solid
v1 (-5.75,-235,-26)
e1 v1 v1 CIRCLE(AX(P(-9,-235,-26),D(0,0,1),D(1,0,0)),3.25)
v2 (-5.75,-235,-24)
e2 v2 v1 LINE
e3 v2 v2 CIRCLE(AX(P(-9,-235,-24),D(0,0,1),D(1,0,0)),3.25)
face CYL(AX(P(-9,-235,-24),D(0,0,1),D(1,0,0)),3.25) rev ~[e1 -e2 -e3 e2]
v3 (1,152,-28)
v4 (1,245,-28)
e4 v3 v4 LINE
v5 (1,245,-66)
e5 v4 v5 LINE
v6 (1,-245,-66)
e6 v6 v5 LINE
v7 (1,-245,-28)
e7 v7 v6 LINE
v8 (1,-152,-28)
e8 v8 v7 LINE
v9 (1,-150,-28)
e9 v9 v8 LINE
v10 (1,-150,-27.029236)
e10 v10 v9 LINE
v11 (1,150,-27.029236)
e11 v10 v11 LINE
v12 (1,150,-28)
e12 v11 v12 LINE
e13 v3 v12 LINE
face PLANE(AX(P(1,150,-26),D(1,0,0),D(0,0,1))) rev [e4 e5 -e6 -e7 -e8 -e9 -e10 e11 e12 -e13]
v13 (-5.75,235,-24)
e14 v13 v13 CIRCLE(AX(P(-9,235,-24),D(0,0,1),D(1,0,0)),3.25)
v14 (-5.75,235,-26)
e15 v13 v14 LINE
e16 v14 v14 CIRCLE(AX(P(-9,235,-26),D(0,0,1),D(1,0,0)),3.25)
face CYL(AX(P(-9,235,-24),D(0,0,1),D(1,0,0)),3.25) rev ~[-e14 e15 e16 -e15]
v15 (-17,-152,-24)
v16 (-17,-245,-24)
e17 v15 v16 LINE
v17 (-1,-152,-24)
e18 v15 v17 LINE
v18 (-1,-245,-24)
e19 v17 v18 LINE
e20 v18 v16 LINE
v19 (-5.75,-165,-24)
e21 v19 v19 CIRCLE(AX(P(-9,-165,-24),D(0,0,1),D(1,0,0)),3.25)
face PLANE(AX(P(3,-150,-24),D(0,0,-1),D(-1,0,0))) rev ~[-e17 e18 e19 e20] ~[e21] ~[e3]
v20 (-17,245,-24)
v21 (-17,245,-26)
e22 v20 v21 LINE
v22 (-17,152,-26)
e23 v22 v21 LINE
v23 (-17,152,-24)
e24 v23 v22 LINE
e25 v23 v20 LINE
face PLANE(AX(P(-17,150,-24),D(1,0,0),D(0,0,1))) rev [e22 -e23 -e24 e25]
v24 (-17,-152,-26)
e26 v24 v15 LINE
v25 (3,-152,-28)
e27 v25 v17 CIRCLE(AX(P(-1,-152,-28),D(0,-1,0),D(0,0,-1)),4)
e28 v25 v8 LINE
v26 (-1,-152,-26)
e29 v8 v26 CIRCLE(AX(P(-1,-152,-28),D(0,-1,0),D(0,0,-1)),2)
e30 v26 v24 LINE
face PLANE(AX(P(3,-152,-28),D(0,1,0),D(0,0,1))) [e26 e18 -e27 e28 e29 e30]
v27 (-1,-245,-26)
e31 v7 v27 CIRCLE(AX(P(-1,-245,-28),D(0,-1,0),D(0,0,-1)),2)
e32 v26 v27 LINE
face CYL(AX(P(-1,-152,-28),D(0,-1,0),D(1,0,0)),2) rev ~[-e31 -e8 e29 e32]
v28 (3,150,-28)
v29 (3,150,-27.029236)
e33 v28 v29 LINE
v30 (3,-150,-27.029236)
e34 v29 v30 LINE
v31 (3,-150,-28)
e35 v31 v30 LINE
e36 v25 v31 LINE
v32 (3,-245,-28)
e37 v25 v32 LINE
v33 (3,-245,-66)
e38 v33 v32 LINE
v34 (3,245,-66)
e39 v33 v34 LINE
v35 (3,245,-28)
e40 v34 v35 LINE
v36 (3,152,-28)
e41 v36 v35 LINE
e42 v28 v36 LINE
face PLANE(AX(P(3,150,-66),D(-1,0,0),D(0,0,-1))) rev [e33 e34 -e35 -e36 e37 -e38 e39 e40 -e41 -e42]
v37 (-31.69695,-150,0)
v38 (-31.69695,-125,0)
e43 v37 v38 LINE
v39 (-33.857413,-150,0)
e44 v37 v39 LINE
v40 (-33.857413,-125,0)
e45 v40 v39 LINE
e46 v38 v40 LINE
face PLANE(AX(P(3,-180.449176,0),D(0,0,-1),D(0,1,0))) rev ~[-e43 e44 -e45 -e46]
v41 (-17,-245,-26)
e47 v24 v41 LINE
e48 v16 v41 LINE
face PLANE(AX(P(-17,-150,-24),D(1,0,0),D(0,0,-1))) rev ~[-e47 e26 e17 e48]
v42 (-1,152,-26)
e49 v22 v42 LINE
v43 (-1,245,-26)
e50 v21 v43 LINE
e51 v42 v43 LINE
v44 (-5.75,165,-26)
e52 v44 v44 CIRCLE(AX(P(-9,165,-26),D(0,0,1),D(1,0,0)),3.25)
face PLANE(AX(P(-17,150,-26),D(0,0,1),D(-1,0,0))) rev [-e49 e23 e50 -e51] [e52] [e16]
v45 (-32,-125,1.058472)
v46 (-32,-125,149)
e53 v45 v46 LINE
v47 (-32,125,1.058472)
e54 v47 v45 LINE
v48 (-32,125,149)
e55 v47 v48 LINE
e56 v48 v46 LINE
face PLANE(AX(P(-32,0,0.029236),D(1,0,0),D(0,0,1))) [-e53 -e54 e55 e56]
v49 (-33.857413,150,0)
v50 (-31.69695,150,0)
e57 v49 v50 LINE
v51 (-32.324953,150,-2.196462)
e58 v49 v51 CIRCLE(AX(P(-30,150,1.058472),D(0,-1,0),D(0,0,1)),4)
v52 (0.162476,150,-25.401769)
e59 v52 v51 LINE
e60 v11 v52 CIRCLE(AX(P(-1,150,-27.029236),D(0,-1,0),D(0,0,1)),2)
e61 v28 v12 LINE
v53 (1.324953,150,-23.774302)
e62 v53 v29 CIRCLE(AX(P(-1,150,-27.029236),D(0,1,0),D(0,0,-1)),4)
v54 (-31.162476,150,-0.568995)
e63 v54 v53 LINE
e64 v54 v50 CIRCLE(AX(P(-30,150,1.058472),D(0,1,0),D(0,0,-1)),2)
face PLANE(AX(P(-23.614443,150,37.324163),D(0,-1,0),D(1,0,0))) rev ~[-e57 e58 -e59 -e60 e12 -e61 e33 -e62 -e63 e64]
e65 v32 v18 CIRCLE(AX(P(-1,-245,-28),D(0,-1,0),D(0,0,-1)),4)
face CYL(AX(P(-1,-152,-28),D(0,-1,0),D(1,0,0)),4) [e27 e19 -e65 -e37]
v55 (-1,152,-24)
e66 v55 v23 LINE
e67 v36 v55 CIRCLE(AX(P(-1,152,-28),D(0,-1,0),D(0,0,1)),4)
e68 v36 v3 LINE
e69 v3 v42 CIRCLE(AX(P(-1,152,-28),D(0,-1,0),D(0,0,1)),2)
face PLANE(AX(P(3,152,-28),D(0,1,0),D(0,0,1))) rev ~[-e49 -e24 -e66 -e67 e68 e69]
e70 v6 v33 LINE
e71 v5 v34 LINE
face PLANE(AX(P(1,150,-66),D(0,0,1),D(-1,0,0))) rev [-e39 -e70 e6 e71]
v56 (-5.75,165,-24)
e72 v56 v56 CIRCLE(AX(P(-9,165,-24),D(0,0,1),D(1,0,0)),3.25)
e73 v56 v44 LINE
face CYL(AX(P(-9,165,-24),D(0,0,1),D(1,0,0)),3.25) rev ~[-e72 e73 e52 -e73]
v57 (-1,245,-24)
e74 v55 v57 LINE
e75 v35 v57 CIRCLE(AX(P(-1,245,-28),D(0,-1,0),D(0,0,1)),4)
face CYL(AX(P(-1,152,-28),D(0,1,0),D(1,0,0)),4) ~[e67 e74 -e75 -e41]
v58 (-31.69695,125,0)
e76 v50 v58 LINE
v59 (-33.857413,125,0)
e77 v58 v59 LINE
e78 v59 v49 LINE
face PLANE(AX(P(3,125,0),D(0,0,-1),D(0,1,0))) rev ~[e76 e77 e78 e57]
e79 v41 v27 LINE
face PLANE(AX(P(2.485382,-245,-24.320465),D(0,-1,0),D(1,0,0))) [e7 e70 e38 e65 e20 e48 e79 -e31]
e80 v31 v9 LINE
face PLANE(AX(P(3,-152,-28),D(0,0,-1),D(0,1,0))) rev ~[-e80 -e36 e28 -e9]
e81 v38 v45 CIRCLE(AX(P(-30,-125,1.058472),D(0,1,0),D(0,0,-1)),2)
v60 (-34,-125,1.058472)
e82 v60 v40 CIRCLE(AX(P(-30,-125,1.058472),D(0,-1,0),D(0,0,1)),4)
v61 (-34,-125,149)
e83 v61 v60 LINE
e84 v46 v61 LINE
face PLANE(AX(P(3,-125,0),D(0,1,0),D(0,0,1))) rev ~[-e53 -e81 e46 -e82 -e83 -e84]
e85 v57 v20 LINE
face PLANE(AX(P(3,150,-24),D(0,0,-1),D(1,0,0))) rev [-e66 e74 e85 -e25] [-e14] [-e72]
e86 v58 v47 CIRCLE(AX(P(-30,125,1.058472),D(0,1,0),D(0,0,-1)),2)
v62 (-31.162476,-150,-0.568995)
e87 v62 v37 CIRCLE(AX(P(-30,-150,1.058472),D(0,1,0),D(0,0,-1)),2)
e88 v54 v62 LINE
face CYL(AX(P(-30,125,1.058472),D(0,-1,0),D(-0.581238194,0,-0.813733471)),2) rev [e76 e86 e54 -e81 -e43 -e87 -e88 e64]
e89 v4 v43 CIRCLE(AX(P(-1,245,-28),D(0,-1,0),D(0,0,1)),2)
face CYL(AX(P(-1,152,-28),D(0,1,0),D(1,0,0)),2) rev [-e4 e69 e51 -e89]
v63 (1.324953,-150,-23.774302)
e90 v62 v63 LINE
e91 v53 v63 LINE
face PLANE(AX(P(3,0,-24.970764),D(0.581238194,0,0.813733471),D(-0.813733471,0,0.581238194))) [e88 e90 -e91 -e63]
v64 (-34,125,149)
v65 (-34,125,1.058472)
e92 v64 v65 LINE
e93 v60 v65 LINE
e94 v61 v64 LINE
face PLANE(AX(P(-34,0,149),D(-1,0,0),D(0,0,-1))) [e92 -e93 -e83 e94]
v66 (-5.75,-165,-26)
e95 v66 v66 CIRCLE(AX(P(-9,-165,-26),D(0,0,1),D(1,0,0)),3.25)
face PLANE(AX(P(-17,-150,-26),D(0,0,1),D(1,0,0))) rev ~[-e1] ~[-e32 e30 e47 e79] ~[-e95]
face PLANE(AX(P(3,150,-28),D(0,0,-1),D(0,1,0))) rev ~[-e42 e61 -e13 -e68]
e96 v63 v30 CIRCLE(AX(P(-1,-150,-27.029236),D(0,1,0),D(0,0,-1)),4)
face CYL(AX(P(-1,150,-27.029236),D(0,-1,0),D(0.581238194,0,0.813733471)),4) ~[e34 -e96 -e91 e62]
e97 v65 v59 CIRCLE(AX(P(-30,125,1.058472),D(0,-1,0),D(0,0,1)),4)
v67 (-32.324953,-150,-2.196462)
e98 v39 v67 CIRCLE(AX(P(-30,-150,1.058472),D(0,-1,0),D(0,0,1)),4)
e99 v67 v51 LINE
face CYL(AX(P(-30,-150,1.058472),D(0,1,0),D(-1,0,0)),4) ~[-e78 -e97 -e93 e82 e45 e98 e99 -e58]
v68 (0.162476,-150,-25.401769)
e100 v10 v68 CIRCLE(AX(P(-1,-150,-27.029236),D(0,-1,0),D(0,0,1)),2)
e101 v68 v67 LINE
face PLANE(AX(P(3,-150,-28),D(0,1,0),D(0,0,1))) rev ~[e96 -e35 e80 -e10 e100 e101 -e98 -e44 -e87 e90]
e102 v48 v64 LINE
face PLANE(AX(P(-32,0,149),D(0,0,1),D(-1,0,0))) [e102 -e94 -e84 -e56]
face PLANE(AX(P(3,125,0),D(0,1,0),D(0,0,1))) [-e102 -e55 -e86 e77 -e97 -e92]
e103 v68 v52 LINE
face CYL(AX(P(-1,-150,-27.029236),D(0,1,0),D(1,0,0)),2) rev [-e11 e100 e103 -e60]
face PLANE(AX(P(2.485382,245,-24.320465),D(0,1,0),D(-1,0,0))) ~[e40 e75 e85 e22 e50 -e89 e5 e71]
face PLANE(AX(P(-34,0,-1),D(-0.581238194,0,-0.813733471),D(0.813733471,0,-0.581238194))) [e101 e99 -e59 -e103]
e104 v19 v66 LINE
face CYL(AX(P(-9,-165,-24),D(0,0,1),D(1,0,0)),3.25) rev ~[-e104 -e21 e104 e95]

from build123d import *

# Parameters (mm, degrees)
F1_DEPTH  = 150
F3_DEPTH  = 95
F4_W      = 2
F4_H      = 56
F6_DEPTH  = 25
F5_W      = 55.4491758279
F5_H      = 188.3780552482
F7_DEPTH  = 50
F8_R      = 2
F9_R      = 4
F10_R     = 3.25
F11_DEPTH = 25


# Not quite as in the source:
# - a pattern or mirror of a feature is missing from the dataset's text; its kind, count and spacing are read off the source's solid


with BuildPart() as f1:
    # F0 (on Front) → F1 (new body, symmetric)
    with BuildSketch(Plane.XZ):
        Polygon((1, -26), (1, -66), (3, -66), (3, -24.9707642094), (-32, 0.0292357906), (-32, 149), (-34, 149), (-34, -1), align=None)
    extrude(amount=F1_DEPTH, both=True)

    # F2 (on face) → F3 (join)
    with BuildSketch(Plane.XZ.offset(150)):
        Polygon((1.6409301068, -24), (3, -24.9707642094), (3, -24), align=None)
        Polygon((-17, -26), (1, -26), (-1.8, -24), (-17, -24), align=None)
        Polygon((1, -27.0292357906), (1, -66), (3, -66), (3, -24.9707642094), (1.6409301068, -24), (-1.8, -24), (1, -26), align=None)
    f3 = extrude(amount=F3_DEPTH)

    # F3_copies: F3 across plane
    add(f3.mirror(Plane.ZX))

    # F4 (on face) → F6 (cut)
    with BuildSketch(Plane.YZ.offset(3)):
        with Locations((-151, 0)):
            Rectangle(F4_W, F4_H)
        with Locations((151, 0)):
            Rectangle(F4_W, F4_H)
    extrude(amount=-F6_DEPTH, mode=Mode.SUBTRACT)

    # F5 (on face) → F7 (cut)
    with BuildSketch(Plane.YZ.offset(3)):
        with Locations((152.724587914, 94.1890276241)):
            Rectangle(F5_W, F5_H)
        with Locations((-152.724587914, 94.1890276241)):
            Rectangle(F5_W, F5_H)
    extrude(amount=-F7_DEPTH, mode=Mode.SUBTRACT)

    # F8
    f8_edges = [f1.edges().sort_by_distance(p)[0] for p in [
        (-32, 0, 0.029236),
        (1, -198.5, -26),
        (1, 0, -26),
        (1, 198.5, -26),
    ]]
    fillet(f8_edges, radius=F8_R)

    # F9
    f9_edges = [f1.edges().sort_by_distance(p)[0] for p in [
        (3, -198.5, -24),
        (3, 0, -24.970764),
        (-34, 0, -1),
        (3, 198.5, -24),
    ]]
    fillet(f9_edges, radius=F9_R)

    # F10 (on face) → F11 (cut)
    with BuildSketch(Plane.XY.offset(-24)):
        with Locations((-9, 235)):
            Circle(F10_R)
        with Locations((-9, 165)):
            Circle(F10_R)
        with Locations((-9, -165)):
            Circle(F10_R)
        with Locations((-9, -235)):
            Circle(F10_R)
    extrude(amount=-F11_DEPTH, mode=Mode.SUBTRACT)


solid = f1.part
